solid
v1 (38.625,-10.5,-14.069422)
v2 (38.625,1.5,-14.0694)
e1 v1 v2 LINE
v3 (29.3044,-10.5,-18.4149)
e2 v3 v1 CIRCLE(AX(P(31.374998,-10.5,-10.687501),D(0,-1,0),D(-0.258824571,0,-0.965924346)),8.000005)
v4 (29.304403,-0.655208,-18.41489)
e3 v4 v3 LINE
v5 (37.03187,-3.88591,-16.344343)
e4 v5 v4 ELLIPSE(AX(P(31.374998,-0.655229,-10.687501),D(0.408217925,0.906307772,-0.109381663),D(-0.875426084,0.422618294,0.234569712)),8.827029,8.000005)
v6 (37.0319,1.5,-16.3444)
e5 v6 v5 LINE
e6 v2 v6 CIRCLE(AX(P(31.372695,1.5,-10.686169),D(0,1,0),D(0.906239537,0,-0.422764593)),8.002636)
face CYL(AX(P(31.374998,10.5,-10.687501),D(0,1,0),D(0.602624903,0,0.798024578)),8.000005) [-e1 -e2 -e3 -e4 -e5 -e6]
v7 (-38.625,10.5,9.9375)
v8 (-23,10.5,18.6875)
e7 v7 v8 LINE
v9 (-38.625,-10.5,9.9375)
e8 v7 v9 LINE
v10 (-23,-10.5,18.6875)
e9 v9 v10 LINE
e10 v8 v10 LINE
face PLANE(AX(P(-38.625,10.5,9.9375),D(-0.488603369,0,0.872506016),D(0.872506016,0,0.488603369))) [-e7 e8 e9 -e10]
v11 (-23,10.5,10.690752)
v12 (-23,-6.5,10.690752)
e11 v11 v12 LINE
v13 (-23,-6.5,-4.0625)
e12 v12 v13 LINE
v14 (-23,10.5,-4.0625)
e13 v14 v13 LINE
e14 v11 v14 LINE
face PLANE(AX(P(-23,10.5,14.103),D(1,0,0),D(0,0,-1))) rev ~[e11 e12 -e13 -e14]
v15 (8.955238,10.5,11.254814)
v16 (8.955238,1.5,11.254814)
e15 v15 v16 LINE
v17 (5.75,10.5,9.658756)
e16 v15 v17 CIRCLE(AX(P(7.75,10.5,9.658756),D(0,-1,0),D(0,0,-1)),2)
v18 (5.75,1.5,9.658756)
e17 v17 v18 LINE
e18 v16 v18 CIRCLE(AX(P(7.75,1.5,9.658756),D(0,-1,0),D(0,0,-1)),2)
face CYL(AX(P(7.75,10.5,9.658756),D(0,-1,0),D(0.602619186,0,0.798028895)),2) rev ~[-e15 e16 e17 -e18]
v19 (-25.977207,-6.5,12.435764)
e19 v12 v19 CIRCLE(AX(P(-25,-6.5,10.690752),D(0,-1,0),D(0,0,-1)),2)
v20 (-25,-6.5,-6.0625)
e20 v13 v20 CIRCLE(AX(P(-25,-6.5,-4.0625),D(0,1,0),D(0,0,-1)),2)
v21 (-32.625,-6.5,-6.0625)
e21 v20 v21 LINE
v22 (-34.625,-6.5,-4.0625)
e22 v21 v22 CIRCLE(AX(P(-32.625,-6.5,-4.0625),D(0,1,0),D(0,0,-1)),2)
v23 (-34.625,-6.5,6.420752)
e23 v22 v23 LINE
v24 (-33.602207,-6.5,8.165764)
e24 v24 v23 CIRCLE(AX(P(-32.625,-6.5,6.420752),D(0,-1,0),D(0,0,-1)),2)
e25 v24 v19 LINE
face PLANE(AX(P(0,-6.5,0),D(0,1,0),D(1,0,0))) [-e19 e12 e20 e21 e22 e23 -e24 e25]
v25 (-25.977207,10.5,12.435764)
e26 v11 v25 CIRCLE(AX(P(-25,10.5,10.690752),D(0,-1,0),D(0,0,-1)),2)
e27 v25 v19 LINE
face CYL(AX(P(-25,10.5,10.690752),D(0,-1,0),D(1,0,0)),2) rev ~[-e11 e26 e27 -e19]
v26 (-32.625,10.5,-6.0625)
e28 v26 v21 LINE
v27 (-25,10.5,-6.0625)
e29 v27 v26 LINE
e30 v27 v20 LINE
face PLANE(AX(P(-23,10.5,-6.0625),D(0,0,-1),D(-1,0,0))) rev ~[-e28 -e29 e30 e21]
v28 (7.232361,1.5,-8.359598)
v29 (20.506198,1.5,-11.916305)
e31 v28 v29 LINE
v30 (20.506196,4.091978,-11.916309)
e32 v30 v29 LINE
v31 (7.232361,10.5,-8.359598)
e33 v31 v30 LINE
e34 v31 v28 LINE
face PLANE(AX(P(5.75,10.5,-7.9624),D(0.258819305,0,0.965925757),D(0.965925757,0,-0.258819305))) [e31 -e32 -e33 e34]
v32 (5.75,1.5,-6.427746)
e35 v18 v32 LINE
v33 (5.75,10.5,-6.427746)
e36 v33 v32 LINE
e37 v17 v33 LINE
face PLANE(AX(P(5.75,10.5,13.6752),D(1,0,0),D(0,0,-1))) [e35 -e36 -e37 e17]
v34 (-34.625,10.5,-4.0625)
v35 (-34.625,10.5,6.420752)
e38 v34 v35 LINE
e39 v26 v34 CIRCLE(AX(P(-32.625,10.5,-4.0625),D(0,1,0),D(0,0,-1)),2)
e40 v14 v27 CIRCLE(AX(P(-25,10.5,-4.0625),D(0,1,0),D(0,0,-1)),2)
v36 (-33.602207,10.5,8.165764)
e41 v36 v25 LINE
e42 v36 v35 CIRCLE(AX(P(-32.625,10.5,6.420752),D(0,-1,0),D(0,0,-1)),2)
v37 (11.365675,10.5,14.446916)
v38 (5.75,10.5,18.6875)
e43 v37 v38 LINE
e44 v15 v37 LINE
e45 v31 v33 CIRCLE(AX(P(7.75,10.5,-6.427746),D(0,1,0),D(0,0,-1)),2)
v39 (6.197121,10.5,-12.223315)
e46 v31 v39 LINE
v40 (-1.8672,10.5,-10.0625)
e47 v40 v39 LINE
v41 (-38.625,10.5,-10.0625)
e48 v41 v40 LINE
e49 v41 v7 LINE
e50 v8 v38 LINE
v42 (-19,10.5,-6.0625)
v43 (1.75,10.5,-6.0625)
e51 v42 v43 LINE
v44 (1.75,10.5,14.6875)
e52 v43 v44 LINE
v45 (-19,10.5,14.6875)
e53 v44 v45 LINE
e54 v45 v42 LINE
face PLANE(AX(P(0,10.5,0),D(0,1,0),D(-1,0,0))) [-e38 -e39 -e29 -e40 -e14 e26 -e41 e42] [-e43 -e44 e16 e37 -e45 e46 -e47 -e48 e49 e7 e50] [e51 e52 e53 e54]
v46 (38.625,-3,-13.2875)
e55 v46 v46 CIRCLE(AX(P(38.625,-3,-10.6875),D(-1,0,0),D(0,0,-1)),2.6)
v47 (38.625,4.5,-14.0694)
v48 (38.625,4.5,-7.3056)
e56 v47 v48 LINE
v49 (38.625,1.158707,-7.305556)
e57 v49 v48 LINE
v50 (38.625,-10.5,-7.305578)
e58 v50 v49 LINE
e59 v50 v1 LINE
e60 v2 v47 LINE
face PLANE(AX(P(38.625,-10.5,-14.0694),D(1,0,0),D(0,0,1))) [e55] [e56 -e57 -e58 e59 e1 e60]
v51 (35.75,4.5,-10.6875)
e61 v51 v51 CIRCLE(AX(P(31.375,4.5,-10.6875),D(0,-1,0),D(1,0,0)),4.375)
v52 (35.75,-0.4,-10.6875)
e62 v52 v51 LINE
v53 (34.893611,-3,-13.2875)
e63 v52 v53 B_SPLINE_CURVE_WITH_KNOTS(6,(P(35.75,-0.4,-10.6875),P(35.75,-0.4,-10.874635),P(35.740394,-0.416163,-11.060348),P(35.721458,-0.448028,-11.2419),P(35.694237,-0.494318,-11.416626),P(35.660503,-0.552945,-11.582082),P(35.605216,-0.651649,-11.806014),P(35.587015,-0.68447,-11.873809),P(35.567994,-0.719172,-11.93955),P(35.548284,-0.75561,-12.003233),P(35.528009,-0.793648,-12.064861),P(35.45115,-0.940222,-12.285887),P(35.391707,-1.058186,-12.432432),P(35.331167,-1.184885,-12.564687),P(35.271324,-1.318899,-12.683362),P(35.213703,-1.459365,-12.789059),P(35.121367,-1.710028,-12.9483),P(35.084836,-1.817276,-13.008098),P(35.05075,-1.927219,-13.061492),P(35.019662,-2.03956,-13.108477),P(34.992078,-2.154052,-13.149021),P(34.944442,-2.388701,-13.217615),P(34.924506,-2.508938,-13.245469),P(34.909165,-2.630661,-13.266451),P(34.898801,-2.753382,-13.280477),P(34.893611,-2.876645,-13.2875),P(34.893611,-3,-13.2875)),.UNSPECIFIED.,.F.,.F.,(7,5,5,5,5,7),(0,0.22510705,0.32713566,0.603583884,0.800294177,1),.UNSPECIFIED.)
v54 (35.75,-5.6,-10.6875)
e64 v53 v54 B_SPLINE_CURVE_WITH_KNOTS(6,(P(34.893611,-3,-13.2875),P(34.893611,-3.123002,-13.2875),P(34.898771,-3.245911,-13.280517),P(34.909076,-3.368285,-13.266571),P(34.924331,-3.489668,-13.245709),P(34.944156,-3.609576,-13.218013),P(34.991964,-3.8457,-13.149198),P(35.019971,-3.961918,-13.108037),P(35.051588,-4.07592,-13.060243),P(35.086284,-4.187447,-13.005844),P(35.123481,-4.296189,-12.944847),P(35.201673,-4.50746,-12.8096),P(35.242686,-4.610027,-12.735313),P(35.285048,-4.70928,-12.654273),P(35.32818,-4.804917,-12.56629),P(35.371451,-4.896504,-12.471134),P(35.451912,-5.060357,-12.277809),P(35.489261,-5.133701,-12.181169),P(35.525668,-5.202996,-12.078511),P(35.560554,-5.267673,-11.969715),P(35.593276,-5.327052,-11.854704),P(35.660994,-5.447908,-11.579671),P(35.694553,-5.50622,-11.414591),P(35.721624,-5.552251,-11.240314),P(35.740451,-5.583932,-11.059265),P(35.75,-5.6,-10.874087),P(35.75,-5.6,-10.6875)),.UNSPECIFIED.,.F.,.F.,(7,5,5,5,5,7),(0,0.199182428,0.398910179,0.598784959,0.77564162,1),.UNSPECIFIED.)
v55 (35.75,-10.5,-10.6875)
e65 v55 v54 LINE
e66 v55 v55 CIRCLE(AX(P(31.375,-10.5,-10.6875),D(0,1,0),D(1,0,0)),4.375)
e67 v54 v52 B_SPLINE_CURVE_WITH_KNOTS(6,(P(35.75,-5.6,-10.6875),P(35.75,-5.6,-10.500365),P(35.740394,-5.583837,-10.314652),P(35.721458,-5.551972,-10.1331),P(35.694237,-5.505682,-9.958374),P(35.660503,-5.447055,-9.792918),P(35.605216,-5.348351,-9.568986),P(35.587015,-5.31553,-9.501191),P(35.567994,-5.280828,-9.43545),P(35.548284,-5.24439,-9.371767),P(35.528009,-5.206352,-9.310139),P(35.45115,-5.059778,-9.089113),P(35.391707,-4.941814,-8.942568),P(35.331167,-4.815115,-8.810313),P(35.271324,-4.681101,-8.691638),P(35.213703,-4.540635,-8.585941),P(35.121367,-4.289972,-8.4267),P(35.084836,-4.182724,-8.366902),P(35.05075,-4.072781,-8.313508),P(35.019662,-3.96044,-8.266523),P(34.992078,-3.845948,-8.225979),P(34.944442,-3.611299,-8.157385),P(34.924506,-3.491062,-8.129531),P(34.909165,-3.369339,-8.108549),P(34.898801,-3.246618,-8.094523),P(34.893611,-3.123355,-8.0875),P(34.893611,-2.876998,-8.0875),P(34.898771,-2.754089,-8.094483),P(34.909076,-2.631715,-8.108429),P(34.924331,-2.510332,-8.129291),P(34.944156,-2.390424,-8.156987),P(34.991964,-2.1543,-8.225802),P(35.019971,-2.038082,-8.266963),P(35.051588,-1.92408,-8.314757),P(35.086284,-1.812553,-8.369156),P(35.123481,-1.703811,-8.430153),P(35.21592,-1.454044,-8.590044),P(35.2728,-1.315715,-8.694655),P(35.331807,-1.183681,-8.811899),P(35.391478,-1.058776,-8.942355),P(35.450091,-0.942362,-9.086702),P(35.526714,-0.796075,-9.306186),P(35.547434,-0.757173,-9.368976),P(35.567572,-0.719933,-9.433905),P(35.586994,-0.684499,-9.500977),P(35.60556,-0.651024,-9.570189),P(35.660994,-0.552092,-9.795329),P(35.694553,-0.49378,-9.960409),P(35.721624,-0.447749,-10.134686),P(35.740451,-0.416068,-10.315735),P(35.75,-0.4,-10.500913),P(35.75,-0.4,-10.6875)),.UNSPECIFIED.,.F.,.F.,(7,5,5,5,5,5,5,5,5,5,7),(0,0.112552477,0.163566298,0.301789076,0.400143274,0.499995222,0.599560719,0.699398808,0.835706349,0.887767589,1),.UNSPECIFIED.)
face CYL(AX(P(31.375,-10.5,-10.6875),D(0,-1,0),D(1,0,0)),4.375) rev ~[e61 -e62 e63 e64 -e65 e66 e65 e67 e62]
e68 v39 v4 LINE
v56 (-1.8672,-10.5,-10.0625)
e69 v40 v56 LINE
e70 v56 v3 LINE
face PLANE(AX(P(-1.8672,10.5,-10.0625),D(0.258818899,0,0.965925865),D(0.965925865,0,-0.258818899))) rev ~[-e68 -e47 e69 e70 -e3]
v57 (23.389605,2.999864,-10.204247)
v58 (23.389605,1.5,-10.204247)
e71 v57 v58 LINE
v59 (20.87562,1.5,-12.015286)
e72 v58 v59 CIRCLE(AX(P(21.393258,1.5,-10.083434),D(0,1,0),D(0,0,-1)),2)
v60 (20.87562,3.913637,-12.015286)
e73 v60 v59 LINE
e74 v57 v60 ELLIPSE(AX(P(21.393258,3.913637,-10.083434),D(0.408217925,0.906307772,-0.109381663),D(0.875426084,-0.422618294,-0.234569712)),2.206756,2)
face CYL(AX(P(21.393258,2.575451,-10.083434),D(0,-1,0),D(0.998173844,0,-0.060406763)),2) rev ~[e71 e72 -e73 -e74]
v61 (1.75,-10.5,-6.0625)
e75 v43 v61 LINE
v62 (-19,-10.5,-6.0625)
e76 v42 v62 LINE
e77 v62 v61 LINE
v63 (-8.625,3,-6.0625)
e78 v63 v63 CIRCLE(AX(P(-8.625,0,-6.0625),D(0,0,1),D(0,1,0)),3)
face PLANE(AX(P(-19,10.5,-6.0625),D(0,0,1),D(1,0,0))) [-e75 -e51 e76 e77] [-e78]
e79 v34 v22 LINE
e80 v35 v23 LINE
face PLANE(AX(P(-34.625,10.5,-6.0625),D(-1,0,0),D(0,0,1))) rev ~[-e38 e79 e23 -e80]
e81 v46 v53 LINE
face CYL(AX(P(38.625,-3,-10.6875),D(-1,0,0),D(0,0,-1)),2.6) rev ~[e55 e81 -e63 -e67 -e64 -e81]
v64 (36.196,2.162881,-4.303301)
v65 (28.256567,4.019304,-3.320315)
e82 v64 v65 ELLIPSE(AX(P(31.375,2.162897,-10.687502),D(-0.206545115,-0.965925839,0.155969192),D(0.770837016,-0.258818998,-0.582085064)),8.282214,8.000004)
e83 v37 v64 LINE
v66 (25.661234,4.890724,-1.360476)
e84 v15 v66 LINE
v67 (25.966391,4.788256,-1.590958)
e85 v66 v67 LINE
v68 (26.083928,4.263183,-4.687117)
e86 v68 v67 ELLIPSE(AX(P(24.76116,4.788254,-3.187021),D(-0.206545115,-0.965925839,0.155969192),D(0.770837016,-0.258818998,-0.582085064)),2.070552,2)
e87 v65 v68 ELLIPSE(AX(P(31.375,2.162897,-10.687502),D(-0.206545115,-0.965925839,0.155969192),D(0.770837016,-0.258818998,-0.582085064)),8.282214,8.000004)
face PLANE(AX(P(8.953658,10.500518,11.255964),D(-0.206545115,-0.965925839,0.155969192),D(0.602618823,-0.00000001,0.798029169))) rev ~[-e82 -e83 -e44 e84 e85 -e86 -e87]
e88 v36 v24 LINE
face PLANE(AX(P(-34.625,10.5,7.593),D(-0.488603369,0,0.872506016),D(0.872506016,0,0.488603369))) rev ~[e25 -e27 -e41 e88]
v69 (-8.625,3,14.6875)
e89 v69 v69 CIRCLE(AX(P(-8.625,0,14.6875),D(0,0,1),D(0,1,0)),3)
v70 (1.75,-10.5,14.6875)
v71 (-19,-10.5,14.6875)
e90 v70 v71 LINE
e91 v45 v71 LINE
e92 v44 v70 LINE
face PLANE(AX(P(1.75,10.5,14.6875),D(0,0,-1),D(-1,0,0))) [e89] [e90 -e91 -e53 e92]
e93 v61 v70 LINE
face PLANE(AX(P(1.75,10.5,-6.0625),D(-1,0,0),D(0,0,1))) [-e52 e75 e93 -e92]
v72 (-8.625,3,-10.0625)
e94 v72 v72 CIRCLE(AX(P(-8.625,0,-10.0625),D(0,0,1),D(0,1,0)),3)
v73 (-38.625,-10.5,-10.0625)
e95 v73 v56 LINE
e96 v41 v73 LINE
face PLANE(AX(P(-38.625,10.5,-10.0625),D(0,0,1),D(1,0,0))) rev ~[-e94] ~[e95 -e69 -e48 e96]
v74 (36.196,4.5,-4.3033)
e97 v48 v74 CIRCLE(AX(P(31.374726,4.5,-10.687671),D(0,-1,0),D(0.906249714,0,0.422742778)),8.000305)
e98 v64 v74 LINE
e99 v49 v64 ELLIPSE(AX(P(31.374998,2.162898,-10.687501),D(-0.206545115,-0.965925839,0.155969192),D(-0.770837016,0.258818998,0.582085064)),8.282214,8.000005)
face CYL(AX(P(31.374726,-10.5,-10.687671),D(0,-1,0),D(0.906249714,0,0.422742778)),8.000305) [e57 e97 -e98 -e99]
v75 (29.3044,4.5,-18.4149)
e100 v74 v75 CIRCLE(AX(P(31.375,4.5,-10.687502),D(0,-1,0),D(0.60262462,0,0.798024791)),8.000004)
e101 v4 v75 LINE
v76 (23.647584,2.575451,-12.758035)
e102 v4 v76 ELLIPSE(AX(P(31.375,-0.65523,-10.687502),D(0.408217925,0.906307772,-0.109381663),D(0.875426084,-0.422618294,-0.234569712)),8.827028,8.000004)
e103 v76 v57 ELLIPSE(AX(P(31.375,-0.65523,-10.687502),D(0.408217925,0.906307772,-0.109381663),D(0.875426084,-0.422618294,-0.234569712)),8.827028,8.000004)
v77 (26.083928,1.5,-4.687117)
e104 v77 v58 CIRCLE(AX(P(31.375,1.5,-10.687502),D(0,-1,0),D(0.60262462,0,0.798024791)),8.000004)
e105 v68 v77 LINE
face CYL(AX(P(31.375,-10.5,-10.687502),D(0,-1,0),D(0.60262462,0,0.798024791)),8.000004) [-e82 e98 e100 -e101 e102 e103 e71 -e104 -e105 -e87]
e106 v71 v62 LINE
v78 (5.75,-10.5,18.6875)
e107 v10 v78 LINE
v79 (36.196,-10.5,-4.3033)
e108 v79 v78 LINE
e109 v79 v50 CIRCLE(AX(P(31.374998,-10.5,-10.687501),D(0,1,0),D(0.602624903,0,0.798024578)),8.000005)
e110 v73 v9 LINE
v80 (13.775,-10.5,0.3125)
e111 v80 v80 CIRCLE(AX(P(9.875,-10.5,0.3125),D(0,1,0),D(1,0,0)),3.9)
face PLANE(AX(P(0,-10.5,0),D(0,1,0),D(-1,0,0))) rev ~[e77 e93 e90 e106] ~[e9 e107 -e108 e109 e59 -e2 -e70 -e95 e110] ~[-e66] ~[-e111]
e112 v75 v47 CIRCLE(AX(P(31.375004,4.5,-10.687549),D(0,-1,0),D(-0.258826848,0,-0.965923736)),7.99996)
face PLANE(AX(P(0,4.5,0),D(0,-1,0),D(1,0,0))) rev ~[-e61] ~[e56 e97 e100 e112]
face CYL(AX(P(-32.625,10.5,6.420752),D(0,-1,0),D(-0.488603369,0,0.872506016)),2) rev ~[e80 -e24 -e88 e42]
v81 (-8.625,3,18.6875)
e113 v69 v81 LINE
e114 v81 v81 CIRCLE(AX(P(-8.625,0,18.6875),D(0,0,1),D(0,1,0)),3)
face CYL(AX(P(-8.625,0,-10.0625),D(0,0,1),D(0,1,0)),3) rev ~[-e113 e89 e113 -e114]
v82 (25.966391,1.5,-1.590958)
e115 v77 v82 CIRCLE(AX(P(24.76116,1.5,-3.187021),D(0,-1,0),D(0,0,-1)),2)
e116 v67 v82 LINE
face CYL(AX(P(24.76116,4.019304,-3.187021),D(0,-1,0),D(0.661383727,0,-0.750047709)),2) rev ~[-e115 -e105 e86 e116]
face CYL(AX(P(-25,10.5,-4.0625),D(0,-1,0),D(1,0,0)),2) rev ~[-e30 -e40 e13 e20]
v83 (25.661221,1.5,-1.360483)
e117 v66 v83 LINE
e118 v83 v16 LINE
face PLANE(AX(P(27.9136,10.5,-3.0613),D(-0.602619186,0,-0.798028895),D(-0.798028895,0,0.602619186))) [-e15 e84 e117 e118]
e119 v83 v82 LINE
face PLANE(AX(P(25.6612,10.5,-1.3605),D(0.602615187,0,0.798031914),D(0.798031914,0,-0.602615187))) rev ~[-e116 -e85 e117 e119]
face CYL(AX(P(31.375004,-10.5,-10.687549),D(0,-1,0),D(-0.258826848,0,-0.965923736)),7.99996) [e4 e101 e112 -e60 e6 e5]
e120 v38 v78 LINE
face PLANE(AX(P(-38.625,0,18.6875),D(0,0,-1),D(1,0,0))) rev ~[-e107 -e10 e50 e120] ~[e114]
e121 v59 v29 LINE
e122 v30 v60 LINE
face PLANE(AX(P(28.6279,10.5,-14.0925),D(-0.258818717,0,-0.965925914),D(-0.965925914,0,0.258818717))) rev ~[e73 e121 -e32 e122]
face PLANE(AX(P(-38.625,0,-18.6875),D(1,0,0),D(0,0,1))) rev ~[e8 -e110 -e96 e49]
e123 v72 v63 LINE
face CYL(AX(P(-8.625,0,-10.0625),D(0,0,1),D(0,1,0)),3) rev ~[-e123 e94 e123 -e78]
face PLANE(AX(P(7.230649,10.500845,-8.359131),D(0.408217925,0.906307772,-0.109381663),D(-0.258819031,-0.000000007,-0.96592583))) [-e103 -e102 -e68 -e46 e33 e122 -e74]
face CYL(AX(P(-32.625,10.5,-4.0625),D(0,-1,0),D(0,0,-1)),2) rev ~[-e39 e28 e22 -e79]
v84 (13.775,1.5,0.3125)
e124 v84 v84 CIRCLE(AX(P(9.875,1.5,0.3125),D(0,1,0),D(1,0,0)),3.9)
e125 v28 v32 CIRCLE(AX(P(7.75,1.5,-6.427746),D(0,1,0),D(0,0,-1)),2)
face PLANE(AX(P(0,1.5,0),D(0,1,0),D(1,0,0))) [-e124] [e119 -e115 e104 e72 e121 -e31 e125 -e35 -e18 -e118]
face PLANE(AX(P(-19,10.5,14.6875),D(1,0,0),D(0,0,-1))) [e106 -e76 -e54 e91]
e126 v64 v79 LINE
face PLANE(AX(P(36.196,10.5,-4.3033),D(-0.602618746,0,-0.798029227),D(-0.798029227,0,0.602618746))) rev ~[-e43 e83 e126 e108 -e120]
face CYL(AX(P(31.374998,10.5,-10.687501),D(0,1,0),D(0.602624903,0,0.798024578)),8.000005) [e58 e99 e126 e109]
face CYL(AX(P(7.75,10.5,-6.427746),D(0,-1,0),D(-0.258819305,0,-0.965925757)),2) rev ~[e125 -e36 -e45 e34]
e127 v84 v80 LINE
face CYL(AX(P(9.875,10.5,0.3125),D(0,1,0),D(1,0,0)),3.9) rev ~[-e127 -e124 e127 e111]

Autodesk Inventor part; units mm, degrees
ref_plane "YZ Plane" through (0, 0, 0) normal (1, 0, 0) x (0, 1, 0)
sketch "Sketch1" plane through (0, 0, 0) normal (0, 1, 0) x (-1, 0, 0)
  line L0 (38.625, 18.6875) -> (-38.625, 18.6875)
  line L1 (-38.625, 18.6875) -> (-38.625, -18.6875)
  line L2 (-38.625, -18.6875) -> (38.625, -18.6875)
  line L3 (38.625, -18.6875) -> (38.625, 18.6875)
  line L4 (38.625, 18.6875) -> (-38.625, -18.6875) construction
  line L5 (-38.625, 18.6875) -> (38.625, -18.6875) construction
  point P0 (0, 0)
  dimension "d0" = 77.25
  dimension "d2" = 37.375
extrude "Extrusion1" add sketch "Sketch1" along normal mid plane 21
sketch "Sketch2" plane through (0, 10.5, 0) normal (0, 1, 0) x (1, 0, 0)
  line L0 (-19, 6.0625) -> (1.75, 6.0625)
  line L1 (1.75, 6.0625) -> (1.75, -14.6875)
  line L2 (1.75, -14.6875) -> (-19, -14.6875)
  line L3 (-19, -14.6875) -> (-19, 6.0625)
  line L4 (-19, 6.0625) -> (1.75, -14.6875) construction
  line L5 (1.75, 6.0625) -> (-19, -14.6875) construction
  line L6 (-38.625, -18.6875) -> (38.625, -18.6875) projected
  line L7 (-38.625, 18.6875) -> (-38.625, -18.6875) projected
  line L8 (-38.625, 10.0625) -> (-1.8672, 10.0625)
  line L9 (-1.8672, 10.0625) -> (29.3044, 18.4149)
  arc A0 (36.196, 4.3033) -> (29.3044, 18.4149) centre (31.375, 10.6875) ccw
  line L10 (38.625, 18.6875) -> (-38.625, 18.6875) projected
  line L11 (36.196, 4.3033) -> (5.75, -18.6875)
  line L12 (-38.625, -9.9375) -> (-23, -18.6875)
  arc A1 (29.3044, 18.4149) -> (36.196, 4.3033) centre (31.375, 10.6875) ccw construction
  circle A2 centre (9.875, -0.3125) radius 3.9
  circle A3 centre (31.375, 10.6875) radius 4.375
  point P0 (0, 0)
  point P1 (-8.625, -4.3125)
  dimension "d5" = 20.75
  dimension "d6" = 20.75
  dimension "d7" = 4
  dimension "d8" = 19.625
  dimension "d9" = 28.75
  dimension "d10" = 16
  dimension "d11" = 70
  dimension "d12" = 44.375
  dimension "d13" = 165
  dimension "d14" = 15.625
  dimension "d15" = 8.75
  dimension "d18" = 7.8
  dimension "d19" = 18.375
  dimension "d20" = 48.5
  dimension "d21" = 8.75
extrude "Extrusion2" cut sketch "Sketch2" against normal blind 23.75 contours L12 L7 L8 L9 A0 L11 L6 keep common part
sketch "Sketch3" plane through (0, 10.5, 0) normal (0, 1, 0) x (1, 0, 0)
  line L0 (-23, 6.0625) -> (-34.625, 6.0625)
  line L1 (-34.625, 6.0625) -> (-34.625, -7.593)
  line L2 (-34.625, -7.593) -> (-23, -14.103)
  line L3 (-23, -14.103) -> (-23, 6.0625)
  line L4 (-19, 6.0625) -> (-19, -14.6875) projected
  line L5 (-38.625, 10.0625) -> (-1.8672, 10.0625) projected
  line L6 (-38.625, 10.0625) -> (-38.625, -9.9375) projected
  line L7 (-23, -18.6875) -> (-38.625, -9.9375) projected
  point P0 (0, 0)
  dimension "d22" = 4
  dimension "d23" = 4
  dimension "d24" = 4
  dimension "d25" = 4
extrude "Extrusion3" cut sketch "Sketch3" against normal blind 17
sketch "Sketch4" plane through (0, 10.5, 0) normal (0, 1, 0) x (1, 0, 0)
  line L0 (5.75, -13.6752) -> (5.75, 7.9624)
  line L1 (5.75, 7.9624) -> (23.2324, 12.6468)
  arc A0 (23.2324, 12.6468) -> (27.9136, 3.0613) centre (31.375, 10.6875) ccw
  line L2 (27.9136, 3.0613) -> (5.75, -13.6752)
  circle A1 centre (31.375, 10.6875) radius 4.375 projected
  line L3 (-1.8672, 10.0625) -> (29.3044, 18.4149) projected
  line L4 (36.196, 4.3033) -> (5.75, -18.6875) projected
  line L5 (1.75, -14.6875) -> (1.75, 6.0625) projected
  point P0 (0, 0)
  dimension "d28" = 4
  dimension "d29" = 4
  dimension "d30" = 4
  dimension "d31" = 4
extrude "Extrusion4" cut sketch "Sketch4" against normal blind 9 contours L0 L1 A0 L2
fillet "Fillet1" radius 2 8 edges at (-34.625, 2, -6.0625) (-23, 2, -6.0625) (-34.625, 2, 7.593) (-23, 2, 14.103) (5.75, 6, 13.6752) (27.9136, 6, -3.0613) (5.75, 6, -7.9624) (23.2324, 6, -12.6468)
ref_plane "Work Plane1" through (7.2324, 10.5, -8.3596) normal (-0.8754261, 0.4226183, 0.2345697) x (0.258819, 0, 0.9659258)
sketch "Sketch5" plane through (7.2324, 10.5, -8.3596) normal (-0.8754261, 0.4226183, 0.2345697) x (0.258819, 0, 0.9659258)
  line L0 (-4, -3.5283) -> (-4, 10.1101) projected
  line L1 (0, 0) -> (0, 5.8077) projected
  line L2 (0, 0) -> (-4, 0)
  line L3 (-4, 0) -> (-4, 17.443)
  line L4 (-4, 17.443) -> (0, 17.443)
  line L5 (0, 17.443) -> (0, 0)
  point P0 (6.2029, -13.383)
extrude "Extrusion5" cut sketch "Sketch5" against normal blind 98.5
ref_plane "Work Plane2" through (8.9552, 10.5, 11.2548) normal (-0.770837, 0.258819, 0.5820851) x (-0.6026188, 0, -0.7980292)
sketch "Sketch6" plane through (8.9552, 10.5, 11.2548) normal (-0.770837, 0.258819, 0.5820851) x (-0.6026188, 0, -0.7980292)
  line L0 (-4, -8.053) -> (-4, 1.8213) projected
  line L1 (0, -5.4181) -> (0, 0) projected
  line L2 (0, 0) -> (-4, 0)
  line L3 (-4, 0) -> (-4, -11.4491)
  line L4 (-4, -11.4491) -> (0, -11.4491)
  line L5 (0, -11.4491) -> (0, 0)
  point P0 (14.3782, 10.2365)
extrude "Extrusion6" cut sketch "Sketch6" against normal blind 98.5
sketch "Sketch7" plane through (0, 10.5, 0) normal (0, 1, 0) x (1, 0, 0)
  line L0 (25.6612, 1.3605) -> (32.3712, 6.4274) projected
  arc A0 (28.6279, 14.0925) -> (32.3712, 6.4274) centre (31.375, 10.6875) ccw projected
  line L1 (28.6279, 14.0925) -> (20.5062, 11.9163) projected
  arc A1 (23.0192, 10.12) -> (20.5062, 11.9163) centre (21.0238, 9.9845) ccw projected
  arc A2 (23.0192, 10.12) -> (25.7898, 4.4468) centre (31.375, 10.6875) ccw projected
  arc A3 (25.6612, 1.3605) -> (25.7898, 4.4468) centre (24.456, 2.9565) ccw projected
  line L2 (35.1997, 8.5633) -> (38.625, 11.1499) projected
  line L3 (38.625, 11.1499) -> (38.625, 14.0694) projected
  arc A4 (38.625, 14.0694) -> (37.0319, 16.3444) centre (31.375, 10.6875) ccw projected
  line L4 (37.0319, 16.3444) -> (32.0515, 15.0099) projected
  arc A5 (35.1997, 8.5633) -> (32.0515, 15.0099) centre (31.375, 10.6875) ccw projected
  point P0 (0, 0)
extrude "Extrusion7" cut sketch "Sketch7" against normal up to surface (9 mm away)
sketch "Sketch8" plane through (0, -10.5, 0) normal (0, -1, 0) x (1, 0, 0)
  arc A0 (29.3044, -18.4149) -> (38.625, -14.0694) centre (31.375, -10.6875) ccw projected
  circle A1 centre (31.375, -10.6875) radius 4.375 projected
  arc A2 (38.625, -7.3056) -> (36.196, -4.3033) centre (31.375, -10.6875) ccw projected
  line L0 (38.625, -14.0694) -> (38.625, -7.3056) projected
  line L1 (36.196, -4.3033) -> (11.3657, 14.4469) projected
  arc A3 (36.196, -4.3033) -> (29.3044, -18.4149) centre (31.375, -10.6875) ccw
  point P0 (0, 0)
extrude "Extrusion8" add sketch "Sketch8" against normal blind 15
fillet "Fillet2" radius 2 2 edges at (28.2566, 2.7597, -3.3203) (23.6476, 2.0377, -12.7581)
sketch "Sketch9" plane through (38.625, -10.5, -7.3056) normal (1, 0, 0) x (0, 0, -1)
  line L0 (0, 0) -> (0, 15) projected
  line L1 (6.7639, 0) -> (0, 0) projected
  line L2 (6.7639, 15) -> (6.7639, 0) projected
  line L3 (0, 15) -> (6.7639, 15) projected
  point P0 (-7.3056, 10.5)
  point P1 (3.3819, 7.5)
  point P2 (3.3819, 15)
  point P3 (6.7639, 7.5)
hole "Hole1" at (38.625, -3, -10.6875) direction (-1, 0, 0) diameter 5.2 end up to surface
sketch "Sketch10" plane through (-1.8672, 10.5, -10.0625) normal (0, 0, -1) x (-1, 0, 0)
  line L0 (-3.6172, -21) -> (17.1328, -21) projected
  line L1 (17.1328, 0) -> (17.1328, -21) projected
  line L2 (17.1328, 0) -> (-3.6172, 0) projected
  line L3 (-3.6172, 0) -> (-3.6172, -21) projected
  point P0 (-1.8672, -10.5)
  point P1 (6.7578, -10.5)
  point P2 (6.7578, 0)
  point P3 (17.1328, -10.5)
hole "Hole2" at (-8.625, 0, -10.0625) direction (0, 0, 1) diameter 6 end through all
equation "\"d6\" = d5"
equation "\"d23\" = d22"
equation "\"d24\" = d23"
equation "\"d25\" = d24"
properties part number "Y Foot Left" material "ABS Plastic"
